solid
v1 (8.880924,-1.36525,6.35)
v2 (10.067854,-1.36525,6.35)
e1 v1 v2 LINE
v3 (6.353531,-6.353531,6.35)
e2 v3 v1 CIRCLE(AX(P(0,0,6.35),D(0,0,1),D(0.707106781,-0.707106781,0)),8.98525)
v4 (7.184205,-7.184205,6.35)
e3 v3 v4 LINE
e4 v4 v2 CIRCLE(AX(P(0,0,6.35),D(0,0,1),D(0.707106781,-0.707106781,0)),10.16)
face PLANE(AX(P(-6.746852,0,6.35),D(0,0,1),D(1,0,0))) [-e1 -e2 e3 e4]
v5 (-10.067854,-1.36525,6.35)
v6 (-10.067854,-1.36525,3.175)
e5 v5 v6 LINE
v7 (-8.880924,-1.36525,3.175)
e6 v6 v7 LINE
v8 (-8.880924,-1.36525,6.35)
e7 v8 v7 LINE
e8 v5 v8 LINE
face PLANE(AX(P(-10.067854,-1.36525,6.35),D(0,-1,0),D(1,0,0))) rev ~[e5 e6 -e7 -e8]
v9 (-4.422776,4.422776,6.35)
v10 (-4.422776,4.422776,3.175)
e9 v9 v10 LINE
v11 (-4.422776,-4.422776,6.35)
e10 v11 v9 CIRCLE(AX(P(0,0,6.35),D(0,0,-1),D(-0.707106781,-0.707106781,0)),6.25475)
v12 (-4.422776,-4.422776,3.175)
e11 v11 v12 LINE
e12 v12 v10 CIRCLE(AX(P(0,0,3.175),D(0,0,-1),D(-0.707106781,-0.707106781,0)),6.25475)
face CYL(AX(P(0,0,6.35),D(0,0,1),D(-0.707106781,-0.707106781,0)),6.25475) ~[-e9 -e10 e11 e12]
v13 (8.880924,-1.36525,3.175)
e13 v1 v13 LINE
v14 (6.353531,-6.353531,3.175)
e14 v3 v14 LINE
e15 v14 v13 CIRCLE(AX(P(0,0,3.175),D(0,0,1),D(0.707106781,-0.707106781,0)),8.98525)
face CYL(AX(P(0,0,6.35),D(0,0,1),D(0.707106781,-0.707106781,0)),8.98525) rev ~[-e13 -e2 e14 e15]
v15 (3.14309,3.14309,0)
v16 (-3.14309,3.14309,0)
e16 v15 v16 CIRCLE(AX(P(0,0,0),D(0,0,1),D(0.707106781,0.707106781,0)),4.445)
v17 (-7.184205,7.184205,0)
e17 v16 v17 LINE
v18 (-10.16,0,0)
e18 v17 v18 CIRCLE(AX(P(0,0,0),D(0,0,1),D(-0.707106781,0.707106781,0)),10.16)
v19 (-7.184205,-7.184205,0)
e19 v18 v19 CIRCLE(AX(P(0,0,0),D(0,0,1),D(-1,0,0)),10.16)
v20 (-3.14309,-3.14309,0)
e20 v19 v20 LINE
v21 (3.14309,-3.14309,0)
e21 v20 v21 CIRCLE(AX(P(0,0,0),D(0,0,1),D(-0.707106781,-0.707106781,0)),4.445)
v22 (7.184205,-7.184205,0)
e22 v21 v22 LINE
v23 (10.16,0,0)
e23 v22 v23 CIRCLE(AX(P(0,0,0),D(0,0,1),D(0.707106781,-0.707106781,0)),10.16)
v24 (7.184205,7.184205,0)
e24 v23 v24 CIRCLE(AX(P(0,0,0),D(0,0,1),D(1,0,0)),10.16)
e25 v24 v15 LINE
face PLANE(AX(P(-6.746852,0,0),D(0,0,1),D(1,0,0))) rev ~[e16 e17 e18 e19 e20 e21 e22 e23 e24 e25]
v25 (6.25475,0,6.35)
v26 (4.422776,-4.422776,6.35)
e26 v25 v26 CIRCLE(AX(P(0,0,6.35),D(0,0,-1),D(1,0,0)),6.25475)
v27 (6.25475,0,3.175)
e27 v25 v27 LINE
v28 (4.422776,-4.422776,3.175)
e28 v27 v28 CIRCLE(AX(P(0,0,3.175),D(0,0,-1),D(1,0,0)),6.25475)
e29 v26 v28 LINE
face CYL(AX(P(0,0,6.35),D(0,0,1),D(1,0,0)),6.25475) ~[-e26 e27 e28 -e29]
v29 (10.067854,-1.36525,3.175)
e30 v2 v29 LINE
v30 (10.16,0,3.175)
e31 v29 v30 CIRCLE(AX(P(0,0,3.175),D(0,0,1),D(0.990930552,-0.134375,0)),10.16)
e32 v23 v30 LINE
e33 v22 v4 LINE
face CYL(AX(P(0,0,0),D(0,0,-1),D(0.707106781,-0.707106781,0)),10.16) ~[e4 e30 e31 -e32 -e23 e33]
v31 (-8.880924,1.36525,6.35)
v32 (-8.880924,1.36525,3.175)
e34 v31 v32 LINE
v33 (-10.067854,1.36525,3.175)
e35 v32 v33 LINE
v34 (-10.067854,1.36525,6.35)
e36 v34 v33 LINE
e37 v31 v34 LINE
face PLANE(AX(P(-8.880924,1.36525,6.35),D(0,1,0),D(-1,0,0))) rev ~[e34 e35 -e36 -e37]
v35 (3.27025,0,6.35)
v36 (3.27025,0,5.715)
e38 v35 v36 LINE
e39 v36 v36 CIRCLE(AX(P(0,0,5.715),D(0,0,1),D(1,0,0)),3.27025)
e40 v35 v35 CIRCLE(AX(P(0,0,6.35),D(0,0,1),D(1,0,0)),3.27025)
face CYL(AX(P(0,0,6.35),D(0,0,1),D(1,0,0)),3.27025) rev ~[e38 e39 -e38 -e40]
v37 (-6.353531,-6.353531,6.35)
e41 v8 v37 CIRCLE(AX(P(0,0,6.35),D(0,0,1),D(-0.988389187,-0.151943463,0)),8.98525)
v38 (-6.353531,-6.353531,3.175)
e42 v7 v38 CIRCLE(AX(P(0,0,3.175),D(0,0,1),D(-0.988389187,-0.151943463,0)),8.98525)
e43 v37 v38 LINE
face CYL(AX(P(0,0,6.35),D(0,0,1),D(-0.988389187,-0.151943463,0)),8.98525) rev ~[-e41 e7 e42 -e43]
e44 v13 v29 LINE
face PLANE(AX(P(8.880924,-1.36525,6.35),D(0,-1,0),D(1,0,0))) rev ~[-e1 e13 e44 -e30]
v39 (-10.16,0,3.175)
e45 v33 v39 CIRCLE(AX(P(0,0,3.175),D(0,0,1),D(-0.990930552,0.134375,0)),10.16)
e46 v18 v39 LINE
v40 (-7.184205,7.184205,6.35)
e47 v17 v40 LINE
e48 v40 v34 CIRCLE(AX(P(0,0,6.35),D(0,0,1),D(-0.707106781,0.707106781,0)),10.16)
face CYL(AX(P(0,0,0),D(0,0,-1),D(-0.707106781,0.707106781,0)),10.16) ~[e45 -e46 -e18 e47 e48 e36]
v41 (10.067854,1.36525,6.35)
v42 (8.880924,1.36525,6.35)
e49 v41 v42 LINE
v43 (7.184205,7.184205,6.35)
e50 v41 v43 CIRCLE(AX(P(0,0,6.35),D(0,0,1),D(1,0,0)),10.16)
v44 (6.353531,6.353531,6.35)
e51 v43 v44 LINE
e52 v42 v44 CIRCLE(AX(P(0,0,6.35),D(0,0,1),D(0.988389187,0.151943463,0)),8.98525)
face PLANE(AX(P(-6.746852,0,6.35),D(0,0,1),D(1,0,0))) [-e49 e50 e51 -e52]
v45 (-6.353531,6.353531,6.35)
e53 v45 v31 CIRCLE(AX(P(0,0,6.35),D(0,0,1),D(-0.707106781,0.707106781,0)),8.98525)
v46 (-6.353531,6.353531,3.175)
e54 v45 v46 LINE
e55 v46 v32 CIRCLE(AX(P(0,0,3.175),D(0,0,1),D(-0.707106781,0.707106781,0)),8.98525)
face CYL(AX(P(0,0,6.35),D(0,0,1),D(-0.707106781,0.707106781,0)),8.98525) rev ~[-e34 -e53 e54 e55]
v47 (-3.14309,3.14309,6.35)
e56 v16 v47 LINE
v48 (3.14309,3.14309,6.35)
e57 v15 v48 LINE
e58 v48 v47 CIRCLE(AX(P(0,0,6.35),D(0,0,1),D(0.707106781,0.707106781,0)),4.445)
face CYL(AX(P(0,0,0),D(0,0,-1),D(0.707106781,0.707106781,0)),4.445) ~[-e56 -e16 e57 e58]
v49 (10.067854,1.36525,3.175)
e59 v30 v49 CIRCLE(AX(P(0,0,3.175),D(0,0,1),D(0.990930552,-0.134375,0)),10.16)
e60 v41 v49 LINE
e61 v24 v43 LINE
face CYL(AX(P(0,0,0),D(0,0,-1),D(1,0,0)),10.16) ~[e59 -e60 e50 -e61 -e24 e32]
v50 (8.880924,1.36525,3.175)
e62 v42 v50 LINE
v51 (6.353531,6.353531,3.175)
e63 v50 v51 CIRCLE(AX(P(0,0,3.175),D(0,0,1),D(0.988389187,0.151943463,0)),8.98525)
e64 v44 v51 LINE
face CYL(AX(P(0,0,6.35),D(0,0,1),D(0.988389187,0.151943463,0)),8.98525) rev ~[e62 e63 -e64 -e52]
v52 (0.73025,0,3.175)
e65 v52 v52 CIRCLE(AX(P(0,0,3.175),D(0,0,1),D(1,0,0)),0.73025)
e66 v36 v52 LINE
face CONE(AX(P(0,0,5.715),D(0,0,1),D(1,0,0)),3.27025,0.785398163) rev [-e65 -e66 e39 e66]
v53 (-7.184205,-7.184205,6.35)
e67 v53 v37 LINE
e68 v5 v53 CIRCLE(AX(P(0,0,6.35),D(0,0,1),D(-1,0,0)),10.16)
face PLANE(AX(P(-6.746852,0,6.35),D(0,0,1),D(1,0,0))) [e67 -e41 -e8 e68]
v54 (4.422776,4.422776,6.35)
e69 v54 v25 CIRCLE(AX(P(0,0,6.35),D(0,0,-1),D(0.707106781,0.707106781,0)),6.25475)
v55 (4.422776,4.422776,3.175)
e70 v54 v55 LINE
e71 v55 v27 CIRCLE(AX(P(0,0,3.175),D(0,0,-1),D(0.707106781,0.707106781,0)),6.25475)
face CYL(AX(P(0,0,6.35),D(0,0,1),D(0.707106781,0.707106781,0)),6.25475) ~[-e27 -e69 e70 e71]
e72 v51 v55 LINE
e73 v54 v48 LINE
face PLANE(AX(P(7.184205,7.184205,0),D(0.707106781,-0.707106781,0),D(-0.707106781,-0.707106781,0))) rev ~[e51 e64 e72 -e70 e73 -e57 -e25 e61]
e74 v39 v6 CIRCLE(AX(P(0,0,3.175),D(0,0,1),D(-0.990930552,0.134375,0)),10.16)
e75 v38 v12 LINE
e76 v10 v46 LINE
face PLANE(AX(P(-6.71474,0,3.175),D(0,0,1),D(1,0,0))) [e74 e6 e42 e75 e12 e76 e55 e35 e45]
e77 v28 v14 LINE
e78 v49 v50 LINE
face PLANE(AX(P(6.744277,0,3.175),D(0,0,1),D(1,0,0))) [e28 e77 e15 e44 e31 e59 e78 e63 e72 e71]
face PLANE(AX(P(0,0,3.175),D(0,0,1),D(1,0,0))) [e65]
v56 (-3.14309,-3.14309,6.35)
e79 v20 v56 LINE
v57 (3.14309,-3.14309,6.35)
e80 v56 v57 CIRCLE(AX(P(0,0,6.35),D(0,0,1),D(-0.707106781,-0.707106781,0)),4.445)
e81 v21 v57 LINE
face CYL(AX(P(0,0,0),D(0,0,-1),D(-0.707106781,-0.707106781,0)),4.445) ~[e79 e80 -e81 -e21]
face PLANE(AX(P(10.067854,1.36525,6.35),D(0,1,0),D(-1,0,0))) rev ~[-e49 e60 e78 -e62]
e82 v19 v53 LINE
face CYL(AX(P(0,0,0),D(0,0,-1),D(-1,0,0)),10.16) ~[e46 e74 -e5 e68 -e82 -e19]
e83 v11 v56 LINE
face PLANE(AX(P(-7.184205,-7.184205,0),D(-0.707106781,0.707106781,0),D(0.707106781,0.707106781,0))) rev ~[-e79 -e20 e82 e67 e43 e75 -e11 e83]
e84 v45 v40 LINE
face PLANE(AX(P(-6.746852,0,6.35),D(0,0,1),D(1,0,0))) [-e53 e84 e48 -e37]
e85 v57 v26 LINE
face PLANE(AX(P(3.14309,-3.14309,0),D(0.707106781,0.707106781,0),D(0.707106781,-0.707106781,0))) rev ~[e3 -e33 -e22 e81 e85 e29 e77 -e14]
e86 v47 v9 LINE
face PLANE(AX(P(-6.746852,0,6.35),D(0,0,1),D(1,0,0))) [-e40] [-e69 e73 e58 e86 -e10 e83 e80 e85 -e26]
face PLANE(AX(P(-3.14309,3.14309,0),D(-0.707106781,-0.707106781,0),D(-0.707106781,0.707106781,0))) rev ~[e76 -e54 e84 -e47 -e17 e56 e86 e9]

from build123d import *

# Parameters (mm, degrees)
F0_R     = 3.27025
F1_DEPTH = 6.35
F2_R     = 3.27025
F3_DEPTH = 3.175
F4_SIZE  = 2.54


# Not quite as in the source:
# - a feature names something its author has since deleted; it is built from what else it names


with BuildPart() as f1:
    # F0 (on Top) → F1 (new body)
    with BuildSketch(Plane.XY):
        with BuildLine():
            ThreePointArc((-4.445, 0), (-4.106644522, 1.7010278569), (-3.1430896424, 3.1430896424))
            Line((-3.1430896424, 3.1430896424), (-7.1842048969, 7.1842048969))
            ThreePointArc((-7.1842048969, 7.1842048969), (-9.3866160503, 3.8880636728), (-10.16, 0))
            ThreePointArc((-10.16, 0), (-9.3866160503, -3.8880636728), (-7.1842048969, -7.1842048969))
            Line((-7.1842048969, -7.1842048969), (-3.1430896424, -3.1430896424))
            ThreePointArc((-3.1430896424, -3.1430896424), (-4.106644522, -1.7010278569), (-4.445, 0))
        make_face()
        with BuildLine():
            ThreePointArc((3.1430896424, -3.1430896424), (4.106644522, -1.7010278569), (4.445, 0))
            ThreePointArc((4.445, 0), (4.106644522, 1.7010278569), (3.1430896424, 3.1430896424))
            ThreePointArc((3.1430896424, 3.1430896424), (0, 4.445), (-3.1430896424, 3.1430896424))
            ThreePointArc((-3.1430896424, 3.1430896424), (-4.106644522, 1.7010278569), (-4.445, 0))
            ThreePointArc((-4.445, 0), (-4.106644522, -1.7010278569), (-3.1430896424, -3.1430896424))
            ThreePointArc((-3.1430896424, -3.1430896424), (0, -4.445), (3.1430896424, -3.1430896424))
        make_face()
        Circle(F0_R, mode=Mode.SUBTRACT)
        with BuildLine():
            ThreePointArc((3.1430896424, 3.1430896424), (4.106644522, 1.7010278569), (4.445, 0))
            ThreePointArc((4.445, 0), (4.106644522, -1.7010278569), (3.1430896424, -3.1430896424))
            Line((3.1430896424, -3.1430896424), (7.1842048969, -7.1842048969))
            ThreePointArc((7.1842048969, -7.1842048969), (9.3866160503, -3.8880636728), (10.16, 0))
            ThreePointArc((10.16, 0), (9.3866160503, 3.8880636728), (7.1842048969, 7.1842048969))
            Line((7.1842048969, 7.1842048969), (3.1430896424, 3.1430896424))
        make_face()
        Circle(F0_R)
    extrude(amount=F1_DEPTH)

    # F2 (on face) → F3 (cut)
    with BuildSketch(Plane.XY.offset(6.35)):
        with BuildLine():
            ThreePointArc((-4.4227761396, -4.4227761396), (-6.25475, 0), (-4.4227761396, 4.4227761396))
            Line((-4.4227761396, 4.4227761396), (-6.3535312057, 6.3535312057))
            ThreePointArc((-6.3535312057, 6.3535312057), (-8.0151664506, 4.0610127224), (-8.8809239384, 1.36525))
            ThreePointArc((-8.8809239384, 1.36525), (-8.98525, 0), (-8.8809239384, -1.36525))
            ThreePointArc((-8.8809239384, -1.36525), (-8.0151664506, -4.0610127224), (-6.3535312057, -6.3535312057))
            Line((-6.3535312057, -6.3535312057), (-4.4227761396, -4.4227761396))
        make_face()
        with BuildLine():
            ThreePointArc((4.4227761396, 4.4227761396), (5.778635506, 2.3935891986), (6.25475, 0))
            ThreePointArc((6.25475, 0), (5.778635506, -2.3935891986), (4.4227761396, -4.4227761396))
            Line((4.4227761396, -4.4227761396), (6.3535312057, -6.3535312057))
            ThreePointArc((6.3535312057, -6.3535312057), (8.0151664506, -4.0610127224), (8.8809239384, -1.36525))
            ThreePointArc((8.8809239384, -1.36525), (8.9591305209, -0.6846151272), (8.98525, 0))
            ThreePointArc((8.98525, 0), (8.9591305209, 0.6846151272), (8.8809239384, 1.36525))
            ThreePointArc((8.8809239384, 1.36525), (8.0151664506, 4.0610127224), (6.3535312057, 6.3535312057))
            Line((6.3535312057, 6.3535312057), (4.4227761396, 4.4227761396))
        make_face()
        with BuildLine():
            ThreePointArc((-8.8809239384, -1.36525), (-8.98525, 0), (-8.8809239384, 1.36525))
            Line((-8.8809239384, 1.36525), (-10.0678544108, 1.36525))
            ThreePointArc((-10.0678544108, 1.36525), (-10.16, 0), (-10.0678544108, -1.36525))
            Line((-10.0678544108, -1.36525), (-8.8809239384, -1.36525))
        make_face()
        with BuildLine():
            Line((10.0678544108, 1.36525), (8.8809239384, 1.36525))
            ThreePointArc((8.8809239384, 1.36525), (8.9591305209, 0.6846151272), (8.98525, 0))
            ThreePointArc((8.98525, 0), (8.9591305209, -0.6846151272), (8.8809239384, -1.36525))
            Line((8.8809239384, -1.36525), (10.0678544108, -1.36525))
            ThreePointArc((10.0678544108, -1.36525), (10.16, 0), (10.0678544108, 1.36525))
        make_face()
        Circle(F2_R)
    extrude(amount=-F3_DEPTH, mode=Mode.SUBTRACT)

    # F4
    f4_edges = [f1.edges().sort_by_distance(p)[0] for p in [
        (-3.27025, 0, 3.175),
    ]]
    chamfer(f4_edges, length=F4_SIZE)


solid = f1.part
